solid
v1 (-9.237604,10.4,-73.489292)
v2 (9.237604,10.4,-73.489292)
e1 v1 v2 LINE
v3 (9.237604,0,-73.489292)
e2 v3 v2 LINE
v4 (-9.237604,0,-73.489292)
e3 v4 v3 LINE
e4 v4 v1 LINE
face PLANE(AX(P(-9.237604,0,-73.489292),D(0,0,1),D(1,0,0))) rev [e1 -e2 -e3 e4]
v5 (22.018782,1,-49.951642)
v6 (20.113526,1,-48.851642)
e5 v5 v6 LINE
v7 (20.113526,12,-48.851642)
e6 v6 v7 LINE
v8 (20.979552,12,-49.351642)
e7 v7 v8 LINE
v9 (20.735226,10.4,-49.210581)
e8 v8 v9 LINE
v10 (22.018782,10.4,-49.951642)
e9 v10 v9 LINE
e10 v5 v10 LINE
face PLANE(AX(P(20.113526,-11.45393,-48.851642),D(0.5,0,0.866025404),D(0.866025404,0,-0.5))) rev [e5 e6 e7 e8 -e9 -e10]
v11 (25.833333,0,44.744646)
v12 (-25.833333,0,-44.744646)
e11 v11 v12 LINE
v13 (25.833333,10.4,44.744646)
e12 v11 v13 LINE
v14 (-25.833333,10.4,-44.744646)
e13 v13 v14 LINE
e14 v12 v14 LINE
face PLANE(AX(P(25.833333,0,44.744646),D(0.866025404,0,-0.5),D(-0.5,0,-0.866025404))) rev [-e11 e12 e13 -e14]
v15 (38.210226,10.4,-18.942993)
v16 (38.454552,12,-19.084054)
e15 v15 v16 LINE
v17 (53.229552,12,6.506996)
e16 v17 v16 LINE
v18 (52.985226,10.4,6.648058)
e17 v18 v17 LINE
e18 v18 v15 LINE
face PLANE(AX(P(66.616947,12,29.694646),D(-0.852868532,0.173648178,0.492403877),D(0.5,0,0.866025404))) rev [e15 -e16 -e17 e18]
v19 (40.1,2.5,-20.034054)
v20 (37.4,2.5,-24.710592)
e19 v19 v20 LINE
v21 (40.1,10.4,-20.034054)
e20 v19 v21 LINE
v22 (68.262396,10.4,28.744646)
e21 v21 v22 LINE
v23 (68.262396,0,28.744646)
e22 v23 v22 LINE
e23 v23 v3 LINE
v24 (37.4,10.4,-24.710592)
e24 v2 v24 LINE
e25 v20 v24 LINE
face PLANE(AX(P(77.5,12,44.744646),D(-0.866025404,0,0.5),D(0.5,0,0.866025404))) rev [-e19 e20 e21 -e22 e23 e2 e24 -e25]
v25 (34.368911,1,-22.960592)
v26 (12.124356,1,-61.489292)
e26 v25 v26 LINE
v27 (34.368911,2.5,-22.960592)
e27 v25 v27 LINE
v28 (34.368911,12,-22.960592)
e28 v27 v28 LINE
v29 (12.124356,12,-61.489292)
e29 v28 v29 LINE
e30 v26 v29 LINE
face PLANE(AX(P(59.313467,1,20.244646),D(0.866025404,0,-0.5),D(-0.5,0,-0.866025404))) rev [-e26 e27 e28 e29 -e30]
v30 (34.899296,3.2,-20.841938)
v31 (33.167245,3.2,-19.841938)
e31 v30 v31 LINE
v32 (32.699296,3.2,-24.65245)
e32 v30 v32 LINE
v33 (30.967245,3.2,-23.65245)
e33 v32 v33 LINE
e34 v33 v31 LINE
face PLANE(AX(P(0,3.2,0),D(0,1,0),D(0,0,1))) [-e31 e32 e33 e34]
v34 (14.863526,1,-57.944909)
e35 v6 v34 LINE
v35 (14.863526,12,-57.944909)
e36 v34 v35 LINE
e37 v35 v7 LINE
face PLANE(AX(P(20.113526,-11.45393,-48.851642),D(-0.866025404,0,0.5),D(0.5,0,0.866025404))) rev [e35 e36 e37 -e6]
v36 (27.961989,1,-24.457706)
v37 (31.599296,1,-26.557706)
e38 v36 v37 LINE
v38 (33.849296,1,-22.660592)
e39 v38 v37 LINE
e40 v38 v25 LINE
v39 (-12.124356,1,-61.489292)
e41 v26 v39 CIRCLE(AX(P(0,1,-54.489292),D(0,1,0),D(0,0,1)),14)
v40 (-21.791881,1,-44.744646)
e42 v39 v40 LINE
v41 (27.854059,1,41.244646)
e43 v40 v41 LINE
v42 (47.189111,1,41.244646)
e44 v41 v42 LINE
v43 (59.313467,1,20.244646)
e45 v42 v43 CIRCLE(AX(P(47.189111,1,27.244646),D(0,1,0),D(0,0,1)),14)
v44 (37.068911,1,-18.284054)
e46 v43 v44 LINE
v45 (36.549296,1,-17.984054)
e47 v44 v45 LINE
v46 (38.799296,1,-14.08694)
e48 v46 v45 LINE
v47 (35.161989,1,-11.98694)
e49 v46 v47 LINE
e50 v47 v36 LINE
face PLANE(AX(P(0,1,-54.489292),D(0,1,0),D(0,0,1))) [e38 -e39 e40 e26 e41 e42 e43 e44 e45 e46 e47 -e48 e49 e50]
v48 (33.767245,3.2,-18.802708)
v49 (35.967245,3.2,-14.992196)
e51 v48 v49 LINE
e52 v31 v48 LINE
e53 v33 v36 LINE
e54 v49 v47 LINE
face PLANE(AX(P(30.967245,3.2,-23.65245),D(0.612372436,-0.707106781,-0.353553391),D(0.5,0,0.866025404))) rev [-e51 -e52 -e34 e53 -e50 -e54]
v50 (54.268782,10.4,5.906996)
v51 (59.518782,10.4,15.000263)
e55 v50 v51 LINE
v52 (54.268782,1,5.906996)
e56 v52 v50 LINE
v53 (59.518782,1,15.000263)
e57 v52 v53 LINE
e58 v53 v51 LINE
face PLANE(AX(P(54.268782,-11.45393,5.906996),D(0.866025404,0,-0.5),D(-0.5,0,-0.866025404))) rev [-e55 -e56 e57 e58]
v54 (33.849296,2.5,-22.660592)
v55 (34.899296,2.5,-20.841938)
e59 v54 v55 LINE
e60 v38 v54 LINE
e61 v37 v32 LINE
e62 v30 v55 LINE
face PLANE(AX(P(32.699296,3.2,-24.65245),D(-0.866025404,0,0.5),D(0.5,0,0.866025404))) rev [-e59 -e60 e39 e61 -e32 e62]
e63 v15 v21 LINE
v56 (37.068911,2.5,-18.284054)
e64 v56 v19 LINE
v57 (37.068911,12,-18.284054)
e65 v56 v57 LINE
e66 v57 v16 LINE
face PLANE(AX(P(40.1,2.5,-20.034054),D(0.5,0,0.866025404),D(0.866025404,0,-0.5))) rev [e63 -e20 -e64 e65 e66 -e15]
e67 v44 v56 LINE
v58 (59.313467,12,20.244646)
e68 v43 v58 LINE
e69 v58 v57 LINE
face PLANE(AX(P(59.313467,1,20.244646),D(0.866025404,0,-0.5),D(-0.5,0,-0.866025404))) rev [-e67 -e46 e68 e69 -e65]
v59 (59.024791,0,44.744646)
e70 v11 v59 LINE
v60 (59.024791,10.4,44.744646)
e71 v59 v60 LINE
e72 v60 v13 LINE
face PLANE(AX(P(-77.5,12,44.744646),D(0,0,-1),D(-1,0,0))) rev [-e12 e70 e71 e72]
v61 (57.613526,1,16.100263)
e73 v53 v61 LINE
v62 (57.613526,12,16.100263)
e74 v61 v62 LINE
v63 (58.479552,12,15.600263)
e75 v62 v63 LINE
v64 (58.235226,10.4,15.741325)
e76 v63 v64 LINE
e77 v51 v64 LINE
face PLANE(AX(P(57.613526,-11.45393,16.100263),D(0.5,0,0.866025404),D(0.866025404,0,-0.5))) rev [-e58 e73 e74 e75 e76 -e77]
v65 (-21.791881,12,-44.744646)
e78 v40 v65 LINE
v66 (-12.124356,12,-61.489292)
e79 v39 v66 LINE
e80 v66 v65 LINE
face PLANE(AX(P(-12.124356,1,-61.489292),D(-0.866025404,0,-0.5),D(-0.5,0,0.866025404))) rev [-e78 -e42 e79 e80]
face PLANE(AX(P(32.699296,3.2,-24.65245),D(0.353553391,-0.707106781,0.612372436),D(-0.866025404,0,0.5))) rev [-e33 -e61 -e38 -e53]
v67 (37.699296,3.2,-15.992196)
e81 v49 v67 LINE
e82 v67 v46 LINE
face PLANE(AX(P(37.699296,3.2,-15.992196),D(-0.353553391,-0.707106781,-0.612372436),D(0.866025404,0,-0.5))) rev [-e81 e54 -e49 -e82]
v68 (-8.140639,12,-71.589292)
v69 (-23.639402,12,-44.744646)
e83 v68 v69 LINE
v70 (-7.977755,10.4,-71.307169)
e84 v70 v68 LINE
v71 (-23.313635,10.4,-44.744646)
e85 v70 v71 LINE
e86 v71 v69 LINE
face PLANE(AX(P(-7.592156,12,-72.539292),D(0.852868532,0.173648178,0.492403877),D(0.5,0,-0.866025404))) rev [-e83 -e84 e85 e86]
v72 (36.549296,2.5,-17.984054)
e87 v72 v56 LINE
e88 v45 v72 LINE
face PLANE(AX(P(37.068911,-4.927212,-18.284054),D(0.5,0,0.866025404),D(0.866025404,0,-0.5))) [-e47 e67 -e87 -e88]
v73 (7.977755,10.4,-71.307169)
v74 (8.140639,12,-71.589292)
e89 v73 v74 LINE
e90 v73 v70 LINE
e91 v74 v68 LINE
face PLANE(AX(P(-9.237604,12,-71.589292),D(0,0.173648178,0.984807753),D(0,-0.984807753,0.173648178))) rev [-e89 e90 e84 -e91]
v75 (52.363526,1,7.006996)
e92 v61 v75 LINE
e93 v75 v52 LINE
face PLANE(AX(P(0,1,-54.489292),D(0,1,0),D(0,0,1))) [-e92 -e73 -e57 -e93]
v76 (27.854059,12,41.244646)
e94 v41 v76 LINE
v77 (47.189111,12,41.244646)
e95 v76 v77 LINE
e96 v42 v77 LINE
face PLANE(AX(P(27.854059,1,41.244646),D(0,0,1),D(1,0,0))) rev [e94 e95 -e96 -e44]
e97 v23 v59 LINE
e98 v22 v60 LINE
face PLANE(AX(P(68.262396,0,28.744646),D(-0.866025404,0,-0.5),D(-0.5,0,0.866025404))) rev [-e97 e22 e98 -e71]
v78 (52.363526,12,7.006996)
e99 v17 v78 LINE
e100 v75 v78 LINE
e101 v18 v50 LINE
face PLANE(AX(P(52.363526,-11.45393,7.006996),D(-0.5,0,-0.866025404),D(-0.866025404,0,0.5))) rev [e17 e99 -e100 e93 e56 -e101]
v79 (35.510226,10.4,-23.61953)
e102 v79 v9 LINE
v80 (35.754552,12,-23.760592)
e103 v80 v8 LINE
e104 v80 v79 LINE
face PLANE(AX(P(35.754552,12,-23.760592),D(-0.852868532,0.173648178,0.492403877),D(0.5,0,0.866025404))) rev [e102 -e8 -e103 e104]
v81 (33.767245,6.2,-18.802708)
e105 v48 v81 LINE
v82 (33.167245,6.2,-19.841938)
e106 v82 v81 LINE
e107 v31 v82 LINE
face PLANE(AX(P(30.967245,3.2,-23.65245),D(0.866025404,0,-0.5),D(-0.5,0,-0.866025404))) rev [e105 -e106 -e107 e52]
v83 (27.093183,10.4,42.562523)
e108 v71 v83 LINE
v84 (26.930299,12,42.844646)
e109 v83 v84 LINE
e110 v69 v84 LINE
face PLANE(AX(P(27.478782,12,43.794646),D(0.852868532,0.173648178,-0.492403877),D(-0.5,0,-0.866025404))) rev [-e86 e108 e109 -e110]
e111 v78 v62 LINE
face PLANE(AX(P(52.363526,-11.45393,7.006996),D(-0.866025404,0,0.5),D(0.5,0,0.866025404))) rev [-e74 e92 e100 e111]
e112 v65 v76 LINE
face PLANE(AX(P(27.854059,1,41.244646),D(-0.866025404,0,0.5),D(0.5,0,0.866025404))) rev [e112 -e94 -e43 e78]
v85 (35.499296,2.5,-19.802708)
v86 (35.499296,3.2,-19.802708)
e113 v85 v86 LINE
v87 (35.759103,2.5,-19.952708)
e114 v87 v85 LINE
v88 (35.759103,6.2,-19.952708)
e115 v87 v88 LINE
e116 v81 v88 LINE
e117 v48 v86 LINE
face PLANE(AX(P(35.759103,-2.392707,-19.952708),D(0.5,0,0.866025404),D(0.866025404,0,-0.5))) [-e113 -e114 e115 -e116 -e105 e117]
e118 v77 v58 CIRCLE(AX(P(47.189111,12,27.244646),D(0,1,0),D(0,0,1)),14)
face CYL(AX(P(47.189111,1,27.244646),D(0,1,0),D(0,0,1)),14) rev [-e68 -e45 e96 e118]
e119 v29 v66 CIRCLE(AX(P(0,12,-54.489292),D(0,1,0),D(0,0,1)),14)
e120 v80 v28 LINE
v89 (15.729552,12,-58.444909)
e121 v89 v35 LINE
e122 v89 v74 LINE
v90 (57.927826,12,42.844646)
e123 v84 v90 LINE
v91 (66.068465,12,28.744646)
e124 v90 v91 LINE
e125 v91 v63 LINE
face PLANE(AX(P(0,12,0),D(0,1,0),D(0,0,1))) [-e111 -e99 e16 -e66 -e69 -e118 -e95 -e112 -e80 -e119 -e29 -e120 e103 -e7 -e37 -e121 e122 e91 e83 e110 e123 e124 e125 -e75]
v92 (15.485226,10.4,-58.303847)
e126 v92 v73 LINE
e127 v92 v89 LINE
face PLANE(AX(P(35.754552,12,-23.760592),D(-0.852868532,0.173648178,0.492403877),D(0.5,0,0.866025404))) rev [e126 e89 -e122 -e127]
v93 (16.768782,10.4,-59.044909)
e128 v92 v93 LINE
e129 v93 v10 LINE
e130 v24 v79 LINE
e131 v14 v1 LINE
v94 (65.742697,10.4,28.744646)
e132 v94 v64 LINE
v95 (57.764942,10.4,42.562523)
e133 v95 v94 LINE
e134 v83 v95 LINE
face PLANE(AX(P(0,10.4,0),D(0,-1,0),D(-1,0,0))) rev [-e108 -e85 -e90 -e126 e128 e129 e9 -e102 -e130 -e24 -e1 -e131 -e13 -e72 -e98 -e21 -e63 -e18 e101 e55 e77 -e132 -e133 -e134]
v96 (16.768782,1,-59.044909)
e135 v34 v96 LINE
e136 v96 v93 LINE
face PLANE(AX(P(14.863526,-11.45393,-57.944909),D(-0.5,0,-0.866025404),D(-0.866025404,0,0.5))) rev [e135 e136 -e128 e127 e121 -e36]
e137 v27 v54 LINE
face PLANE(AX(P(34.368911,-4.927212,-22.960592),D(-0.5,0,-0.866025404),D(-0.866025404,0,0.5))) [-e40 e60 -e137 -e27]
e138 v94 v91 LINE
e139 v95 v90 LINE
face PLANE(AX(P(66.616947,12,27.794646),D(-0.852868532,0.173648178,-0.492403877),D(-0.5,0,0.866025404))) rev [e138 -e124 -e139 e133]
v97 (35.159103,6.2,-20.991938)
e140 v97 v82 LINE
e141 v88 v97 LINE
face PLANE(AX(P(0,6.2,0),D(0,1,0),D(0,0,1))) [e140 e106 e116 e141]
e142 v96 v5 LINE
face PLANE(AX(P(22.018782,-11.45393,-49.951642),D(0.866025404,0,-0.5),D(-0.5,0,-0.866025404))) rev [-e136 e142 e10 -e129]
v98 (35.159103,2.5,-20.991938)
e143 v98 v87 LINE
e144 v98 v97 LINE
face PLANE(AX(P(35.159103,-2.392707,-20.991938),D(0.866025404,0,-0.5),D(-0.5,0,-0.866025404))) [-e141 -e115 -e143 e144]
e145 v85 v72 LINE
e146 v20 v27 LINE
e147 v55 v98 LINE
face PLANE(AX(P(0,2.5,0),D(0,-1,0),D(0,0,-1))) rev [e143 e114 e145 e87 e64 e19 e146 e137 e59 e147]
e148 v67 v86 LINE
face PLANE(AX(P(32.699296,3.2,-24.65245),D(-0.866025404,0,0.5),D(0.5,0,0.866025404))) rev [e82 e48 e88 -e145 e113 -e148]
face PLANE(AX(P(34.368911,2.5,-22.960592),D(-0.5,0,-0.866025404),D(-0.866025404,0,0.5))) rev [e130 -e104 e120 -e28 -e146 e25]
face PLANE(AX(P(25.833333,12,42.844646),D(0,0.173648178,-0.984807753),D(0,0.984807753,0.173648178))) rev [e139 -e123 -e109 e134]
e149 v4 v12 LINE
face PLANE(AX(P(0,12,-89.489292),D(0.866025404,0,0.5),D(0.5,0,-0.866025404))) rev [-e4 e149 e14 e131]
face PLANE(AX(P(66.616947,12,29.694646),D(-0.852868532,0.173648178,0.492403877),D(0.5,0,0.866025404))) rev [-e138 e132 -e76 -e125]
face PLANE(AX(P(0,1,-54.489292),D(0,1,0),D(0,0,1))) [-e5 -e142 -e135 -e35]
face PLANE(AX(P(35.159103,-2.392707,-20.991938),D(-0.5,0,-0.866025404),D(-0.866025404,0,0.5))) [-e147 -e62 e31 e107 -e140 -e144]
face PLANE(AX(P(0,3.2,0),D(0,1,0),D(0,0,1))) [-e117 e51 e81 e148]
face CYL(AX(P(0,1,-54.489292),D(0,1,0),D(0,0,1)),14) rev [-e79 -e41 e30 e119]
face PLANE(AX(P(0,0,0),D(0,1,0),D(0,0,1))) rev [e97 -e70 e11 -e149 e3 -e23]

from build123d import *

# Parameters (mm, degrees)
BOSS_EXTRU_1_DEPTH              = 12
ENL_V_MAT_EXTRU_1_DEPTH         = 119.989845505
ENL_V_MAT_EXTRU_2_DEPTH         = 11
ENL_V_MAT_EXTRU_3_DEPTH         = 9.5
BOSS_EXTRU_6_DEPTH              = 2.2
BOSS_EXTRU_8_DEPTH              = 1.5
BOSS_EXTRU_7_DEPTH              = 3
BOSS_EXTRU_7_DIRECTION_2_REACH  = 102.687
CHANFREIN3_SIZE                 = 2.2
ENL_V_DE_MAT_EXTRU_MINCE1_DEPTH = 1.6
ENL_V_DE_MAT_EXTRU_MINCE1_DRAFT = 10
ENL_V_MAT_EXTRU_10_DEPTH        = 11


with BuildPart() as part:
    # Esquisse1 → Boss.-Extru.1 (new body)
    with BuildSketch(Plane(origin=(0, 0, 0), x_dir=(1, 0, 0), z_dir=(0, 1, 0))):
        Polygon((-77.5, -44.744645862), (77.5, -44.744645862), (0, 89.489291724), align=None)
    extrude(amount=BOSS_EXTRU_1_DEPTH)

    # Esquisse2 → Enlèv. mat.-Extru.1 (cut, through all)
    with BuildSketch(Plane(origin=(0, 12, 0), x_dir=(1, 0, 0), z_dir=(0, 1, 0))):
        Polygon((-9.237604307, 73.489291724), (9.237604307, 73.489291724), (0, 89.489291724), align=None)
        Polygon((77.5, -44.744645862), (68.262395693, -28.744645862), (59.024791386, -44.744645862), align=None)
        Polygon((-77.5, -44.744645862), (25.833333333, -44.744645862), (-25.833333333, 44.744645862), align=None)
    extrude(amount=-ENL_V_MAT_EXTRU_1_DEPTH, mode=Mode.SUBTRACT)

    # Esquisse3 → Enlèv. mat.-Extru.2 (cut)
    with BuildSketch(Plane(origin=(0, 12, 0), x_dir=(1, 0, 0), z_dir=(0, 1, 0))):
        with BuildLine():
            Line((59.313466521, -20.244645862), (12.124355653, 61.489291724))
            ThreePointArc((12.124355653, 61.489291724), (0, 68.489291724), (-12.124355653, 61.489291724))
            Line((-12.124355653, 61.489291724), (-21.791881449, 44.744645862))
            Line((-21.791881449, 44.744645862), (27.854059275, -41.244645862))
            Line((27.854059275, -41.244645862), (47.189110868, -41.244645862))
            ThreePointArc((47.189110868, -41.244645862), (59.313466521, -34.244645862), (59.313466521, -20.244645862))
        make_face()
    extrude(amount=-ENL_V_MAT_EXTRU_2_DEPTH, mode=Mode.SUBTRACT)

    # Esquisse4 → Enlèv. mat.-Extru.3 (cut)
    with BuildSketch(Plane(origin=(0, 12, 0), x_dir=(1, 0, 0), z_dir=(0, 1, 0))):
        Polygon((37.068911087, 18.284054341), (34.368911087, 22.960591521), (37.4, 24.710591521), (40.1, 20.034054341), align=None)
    extrude(amount=-ENL_V_MAT_EXTRU_3_DEPTH, mode=Mode.SUBTRACT)

    # Esquisse14 → Boss.-Extru.6 (add)
    with BuildSketch(Plane(origin=(0, 1, 0), x_dir=(1, 0, 0), z_dir=(0, 1, 0))):
        Polygon((32.699295844, 24.65244995), (37.699295844, 15.992195912), (35.967245037, 14.992195912), (30.967245037, 23.65244995), align=None)
    extrude(amount=BOSS_EXTRU_6_DEPTH)

    # Esquisse19 → Boss.-Extru.8 (add)
    with BuildSketch(Plane(origin=(0, 2.5, 0), x_dir=(1, 0, 0), z_dir=(0, 1, 0))):
        Polygon((34.368911087, 22.960591521), (37.068911087, 18.284054341), (36.549295844, 17.984054341), (33.849295844, 22.660591521), align=None)
    extrude(amount=-BOSS_EXTRU_8_DEPTH)

    # Esquisse15 → Boss.-Extru.7 (add)
    with BuildSketch(Plane(origin=(0, 3.2, 0), x_dir=(1, 0, 0), z_dir=(0, 1, 0))):
        Polygon((35.159103466, 20.991938173), (35.759103466, 19.952707689), (33.767245037, 18.802707689), (33.167245037, 19.841938173), align=None)
    extrude(amount=BOSS_EXTRU_7_DEPTH)

    # Boss.-Extru.7 direction 2: up to this face of the body (flat: up to its plane)
    boss_extru_7_direction_2_end = Plane(part.part.faces().sort_by_distance((19.594473703, 1, -11.312874667))[0])
    # Esquisse15 → Boss.-Extru.7 direction 2 (add, up to the picked face)
    with BuildSketch(Plane(origin=(0, 3.2, 0), x_dir=(1, 0, 0), z_dir=(0, 1, 0)), mode=Mode.PRIVATE) as boss_extru_7_direction_2_sk1:
        Polygon((35.159103466, 20.991938173), (35.759103466, 19.952707689), (33.767245037, 18.802707689), (33.167245037, 19.841938173), align=None)
    boss_extru_7_direction_2_tool1 = split(extrude(boss_extru_7_direction_2_sk1.sketch, amount=-BOSS_EXTRU_7_DIRECTION_2_REACH, mode=Mode.PRIVATE), bisect_by=boss_extru_7_direction_2_end, keep=Keep.BOTH, mode=Mode.PRIVATE)
    add(boss_extru_7_direction_2_tool1.solids().sort_by(Axis((34.463174, 3.2, -19.897323), (0, -1, 0)))[0])

    # Chanfrein3
    chanfrein3_edges = [part.edges().sort_by_distance(p)[0] for p in [
        (33.467245037, 1, -19.322322931),
        (36.833270441, 1, -15.492195912),
        (31.833270441, 1, -24.15244995),
    ]]
    chamfer(chanfrein3_edges, length=CHANFREIN3_SIZE - 0.0001)  # a hair under: the kernel refuses the full size


with BuildPart() as enl_v_de_mat_extru_mince1_tool:
    # Esquisse17 → Enlèv. de mat.-Extru.-Mince1 (with draft: the straight prism first)
    with BuildSketch(Plane(origin=(0, 12, 0), x_dir=(1, 0, 0), z_dir=(0, 1, 0))):
        Polygon((37.4, 24.710591521), (9.237604307, 73.489291724), (-9.237604307, 73.489291724), (-25.833333333, 44.744645862), (25.833333333, -44.744645862), (59.024791386, -44.744645862), (68.262395693, -28.744645862), (40.1, 20.034054341), (38.454551733, 19.084054341), (66.06846467, -28.744645862), (57.927825874, -42.844645862), (26.930298845, -42.844645862), (-23.63940231, 44.744645862), (-8.140638796, 71.589291724), (8.140638796, 71.589291724), (35.754551733, 23.760591521), align=None)
    extrude(amount=-ENL_V_DE_MAT_EXTRU_MINCE1_DEPTH)
    # Enlèv. de mat.-Extru.-Mince1: the draft: its side faces are tilted about the plane it starts from
    enl_v_de_mat_extru_mince1_sides = [enl_v_de_mat_extru_mince1_tool.faces().sort_by_distance(p)[0] for p in [
        (23.318802154, 11.2, -49.099941623),
        (0, 11.2, -73.489291724),
        (-17.53546882, 11.2, -59.116968793),
        (0, 11.2, 0),
        (42.42906236, 11.2, 44.744645862),
        (63.643593539, 11.2, 36.744645862),
        (54.181197846, 11.2, 4.355295761),
        (39.277275866, 11.2, -19.559054341),
        (52.261508201, 11.2, 4.830295761),
        (61.998145272, 11.2, 35.794645862),
        (42.42906236, 11.2, 42.844645862),
        (1.645448267, 11.2, -0.95),
        (-15.890020553, 11.2, -58.166968793),
        (0, 11.2, -71.589291724),
        (21.947595264, 11.2, -47.674941623),
        (36.577275866, 11.2, -24.235591521),
    ]]
    draft(enl_v_de_mat_extru_mince1_sides, Plane(origin=(0, 12, 0), x_dir=(1, 0, 0), z_dir=(0, 1, 0)), ENL_V_DE_MAT_EXTRU_MINCE1_DRAFT)


with BuildPart() as part_1:
    add(part.part)

    # Enlèv. de mat.-Extru.-Mince1: cut by enl_v_de_mat_extru_mince1_tool
    add(enl_v_de_mat_extru_mince1_tool.part, mode=Mode.SUBTRACT)

    # Esquisse18 → Enlèv. mat.-Extru.10 (cut)
    with BuildSketch(Plane(origin=(0, 12, 0), x_dir=(1, 0, 0), z_dir=(0, 1, 0))):
        Polygon((57.613526329, -16.100263081), (59.518782217, -15.000263081), (54.268782217, -5.906996341), (52.363526329, -7.006996341), align=None)
        Polygon((20.113526329, 48.851642203), (14.863526329, 57.944908943), (16.768782217, 59.044908943), (22.018782217, 49.951642203), align=None)
    extrude(amount=-ENL_V_MAT_EXTRU_10_DEPTH, mode=Mode.SUBTRACT)


solid = part_1.part
